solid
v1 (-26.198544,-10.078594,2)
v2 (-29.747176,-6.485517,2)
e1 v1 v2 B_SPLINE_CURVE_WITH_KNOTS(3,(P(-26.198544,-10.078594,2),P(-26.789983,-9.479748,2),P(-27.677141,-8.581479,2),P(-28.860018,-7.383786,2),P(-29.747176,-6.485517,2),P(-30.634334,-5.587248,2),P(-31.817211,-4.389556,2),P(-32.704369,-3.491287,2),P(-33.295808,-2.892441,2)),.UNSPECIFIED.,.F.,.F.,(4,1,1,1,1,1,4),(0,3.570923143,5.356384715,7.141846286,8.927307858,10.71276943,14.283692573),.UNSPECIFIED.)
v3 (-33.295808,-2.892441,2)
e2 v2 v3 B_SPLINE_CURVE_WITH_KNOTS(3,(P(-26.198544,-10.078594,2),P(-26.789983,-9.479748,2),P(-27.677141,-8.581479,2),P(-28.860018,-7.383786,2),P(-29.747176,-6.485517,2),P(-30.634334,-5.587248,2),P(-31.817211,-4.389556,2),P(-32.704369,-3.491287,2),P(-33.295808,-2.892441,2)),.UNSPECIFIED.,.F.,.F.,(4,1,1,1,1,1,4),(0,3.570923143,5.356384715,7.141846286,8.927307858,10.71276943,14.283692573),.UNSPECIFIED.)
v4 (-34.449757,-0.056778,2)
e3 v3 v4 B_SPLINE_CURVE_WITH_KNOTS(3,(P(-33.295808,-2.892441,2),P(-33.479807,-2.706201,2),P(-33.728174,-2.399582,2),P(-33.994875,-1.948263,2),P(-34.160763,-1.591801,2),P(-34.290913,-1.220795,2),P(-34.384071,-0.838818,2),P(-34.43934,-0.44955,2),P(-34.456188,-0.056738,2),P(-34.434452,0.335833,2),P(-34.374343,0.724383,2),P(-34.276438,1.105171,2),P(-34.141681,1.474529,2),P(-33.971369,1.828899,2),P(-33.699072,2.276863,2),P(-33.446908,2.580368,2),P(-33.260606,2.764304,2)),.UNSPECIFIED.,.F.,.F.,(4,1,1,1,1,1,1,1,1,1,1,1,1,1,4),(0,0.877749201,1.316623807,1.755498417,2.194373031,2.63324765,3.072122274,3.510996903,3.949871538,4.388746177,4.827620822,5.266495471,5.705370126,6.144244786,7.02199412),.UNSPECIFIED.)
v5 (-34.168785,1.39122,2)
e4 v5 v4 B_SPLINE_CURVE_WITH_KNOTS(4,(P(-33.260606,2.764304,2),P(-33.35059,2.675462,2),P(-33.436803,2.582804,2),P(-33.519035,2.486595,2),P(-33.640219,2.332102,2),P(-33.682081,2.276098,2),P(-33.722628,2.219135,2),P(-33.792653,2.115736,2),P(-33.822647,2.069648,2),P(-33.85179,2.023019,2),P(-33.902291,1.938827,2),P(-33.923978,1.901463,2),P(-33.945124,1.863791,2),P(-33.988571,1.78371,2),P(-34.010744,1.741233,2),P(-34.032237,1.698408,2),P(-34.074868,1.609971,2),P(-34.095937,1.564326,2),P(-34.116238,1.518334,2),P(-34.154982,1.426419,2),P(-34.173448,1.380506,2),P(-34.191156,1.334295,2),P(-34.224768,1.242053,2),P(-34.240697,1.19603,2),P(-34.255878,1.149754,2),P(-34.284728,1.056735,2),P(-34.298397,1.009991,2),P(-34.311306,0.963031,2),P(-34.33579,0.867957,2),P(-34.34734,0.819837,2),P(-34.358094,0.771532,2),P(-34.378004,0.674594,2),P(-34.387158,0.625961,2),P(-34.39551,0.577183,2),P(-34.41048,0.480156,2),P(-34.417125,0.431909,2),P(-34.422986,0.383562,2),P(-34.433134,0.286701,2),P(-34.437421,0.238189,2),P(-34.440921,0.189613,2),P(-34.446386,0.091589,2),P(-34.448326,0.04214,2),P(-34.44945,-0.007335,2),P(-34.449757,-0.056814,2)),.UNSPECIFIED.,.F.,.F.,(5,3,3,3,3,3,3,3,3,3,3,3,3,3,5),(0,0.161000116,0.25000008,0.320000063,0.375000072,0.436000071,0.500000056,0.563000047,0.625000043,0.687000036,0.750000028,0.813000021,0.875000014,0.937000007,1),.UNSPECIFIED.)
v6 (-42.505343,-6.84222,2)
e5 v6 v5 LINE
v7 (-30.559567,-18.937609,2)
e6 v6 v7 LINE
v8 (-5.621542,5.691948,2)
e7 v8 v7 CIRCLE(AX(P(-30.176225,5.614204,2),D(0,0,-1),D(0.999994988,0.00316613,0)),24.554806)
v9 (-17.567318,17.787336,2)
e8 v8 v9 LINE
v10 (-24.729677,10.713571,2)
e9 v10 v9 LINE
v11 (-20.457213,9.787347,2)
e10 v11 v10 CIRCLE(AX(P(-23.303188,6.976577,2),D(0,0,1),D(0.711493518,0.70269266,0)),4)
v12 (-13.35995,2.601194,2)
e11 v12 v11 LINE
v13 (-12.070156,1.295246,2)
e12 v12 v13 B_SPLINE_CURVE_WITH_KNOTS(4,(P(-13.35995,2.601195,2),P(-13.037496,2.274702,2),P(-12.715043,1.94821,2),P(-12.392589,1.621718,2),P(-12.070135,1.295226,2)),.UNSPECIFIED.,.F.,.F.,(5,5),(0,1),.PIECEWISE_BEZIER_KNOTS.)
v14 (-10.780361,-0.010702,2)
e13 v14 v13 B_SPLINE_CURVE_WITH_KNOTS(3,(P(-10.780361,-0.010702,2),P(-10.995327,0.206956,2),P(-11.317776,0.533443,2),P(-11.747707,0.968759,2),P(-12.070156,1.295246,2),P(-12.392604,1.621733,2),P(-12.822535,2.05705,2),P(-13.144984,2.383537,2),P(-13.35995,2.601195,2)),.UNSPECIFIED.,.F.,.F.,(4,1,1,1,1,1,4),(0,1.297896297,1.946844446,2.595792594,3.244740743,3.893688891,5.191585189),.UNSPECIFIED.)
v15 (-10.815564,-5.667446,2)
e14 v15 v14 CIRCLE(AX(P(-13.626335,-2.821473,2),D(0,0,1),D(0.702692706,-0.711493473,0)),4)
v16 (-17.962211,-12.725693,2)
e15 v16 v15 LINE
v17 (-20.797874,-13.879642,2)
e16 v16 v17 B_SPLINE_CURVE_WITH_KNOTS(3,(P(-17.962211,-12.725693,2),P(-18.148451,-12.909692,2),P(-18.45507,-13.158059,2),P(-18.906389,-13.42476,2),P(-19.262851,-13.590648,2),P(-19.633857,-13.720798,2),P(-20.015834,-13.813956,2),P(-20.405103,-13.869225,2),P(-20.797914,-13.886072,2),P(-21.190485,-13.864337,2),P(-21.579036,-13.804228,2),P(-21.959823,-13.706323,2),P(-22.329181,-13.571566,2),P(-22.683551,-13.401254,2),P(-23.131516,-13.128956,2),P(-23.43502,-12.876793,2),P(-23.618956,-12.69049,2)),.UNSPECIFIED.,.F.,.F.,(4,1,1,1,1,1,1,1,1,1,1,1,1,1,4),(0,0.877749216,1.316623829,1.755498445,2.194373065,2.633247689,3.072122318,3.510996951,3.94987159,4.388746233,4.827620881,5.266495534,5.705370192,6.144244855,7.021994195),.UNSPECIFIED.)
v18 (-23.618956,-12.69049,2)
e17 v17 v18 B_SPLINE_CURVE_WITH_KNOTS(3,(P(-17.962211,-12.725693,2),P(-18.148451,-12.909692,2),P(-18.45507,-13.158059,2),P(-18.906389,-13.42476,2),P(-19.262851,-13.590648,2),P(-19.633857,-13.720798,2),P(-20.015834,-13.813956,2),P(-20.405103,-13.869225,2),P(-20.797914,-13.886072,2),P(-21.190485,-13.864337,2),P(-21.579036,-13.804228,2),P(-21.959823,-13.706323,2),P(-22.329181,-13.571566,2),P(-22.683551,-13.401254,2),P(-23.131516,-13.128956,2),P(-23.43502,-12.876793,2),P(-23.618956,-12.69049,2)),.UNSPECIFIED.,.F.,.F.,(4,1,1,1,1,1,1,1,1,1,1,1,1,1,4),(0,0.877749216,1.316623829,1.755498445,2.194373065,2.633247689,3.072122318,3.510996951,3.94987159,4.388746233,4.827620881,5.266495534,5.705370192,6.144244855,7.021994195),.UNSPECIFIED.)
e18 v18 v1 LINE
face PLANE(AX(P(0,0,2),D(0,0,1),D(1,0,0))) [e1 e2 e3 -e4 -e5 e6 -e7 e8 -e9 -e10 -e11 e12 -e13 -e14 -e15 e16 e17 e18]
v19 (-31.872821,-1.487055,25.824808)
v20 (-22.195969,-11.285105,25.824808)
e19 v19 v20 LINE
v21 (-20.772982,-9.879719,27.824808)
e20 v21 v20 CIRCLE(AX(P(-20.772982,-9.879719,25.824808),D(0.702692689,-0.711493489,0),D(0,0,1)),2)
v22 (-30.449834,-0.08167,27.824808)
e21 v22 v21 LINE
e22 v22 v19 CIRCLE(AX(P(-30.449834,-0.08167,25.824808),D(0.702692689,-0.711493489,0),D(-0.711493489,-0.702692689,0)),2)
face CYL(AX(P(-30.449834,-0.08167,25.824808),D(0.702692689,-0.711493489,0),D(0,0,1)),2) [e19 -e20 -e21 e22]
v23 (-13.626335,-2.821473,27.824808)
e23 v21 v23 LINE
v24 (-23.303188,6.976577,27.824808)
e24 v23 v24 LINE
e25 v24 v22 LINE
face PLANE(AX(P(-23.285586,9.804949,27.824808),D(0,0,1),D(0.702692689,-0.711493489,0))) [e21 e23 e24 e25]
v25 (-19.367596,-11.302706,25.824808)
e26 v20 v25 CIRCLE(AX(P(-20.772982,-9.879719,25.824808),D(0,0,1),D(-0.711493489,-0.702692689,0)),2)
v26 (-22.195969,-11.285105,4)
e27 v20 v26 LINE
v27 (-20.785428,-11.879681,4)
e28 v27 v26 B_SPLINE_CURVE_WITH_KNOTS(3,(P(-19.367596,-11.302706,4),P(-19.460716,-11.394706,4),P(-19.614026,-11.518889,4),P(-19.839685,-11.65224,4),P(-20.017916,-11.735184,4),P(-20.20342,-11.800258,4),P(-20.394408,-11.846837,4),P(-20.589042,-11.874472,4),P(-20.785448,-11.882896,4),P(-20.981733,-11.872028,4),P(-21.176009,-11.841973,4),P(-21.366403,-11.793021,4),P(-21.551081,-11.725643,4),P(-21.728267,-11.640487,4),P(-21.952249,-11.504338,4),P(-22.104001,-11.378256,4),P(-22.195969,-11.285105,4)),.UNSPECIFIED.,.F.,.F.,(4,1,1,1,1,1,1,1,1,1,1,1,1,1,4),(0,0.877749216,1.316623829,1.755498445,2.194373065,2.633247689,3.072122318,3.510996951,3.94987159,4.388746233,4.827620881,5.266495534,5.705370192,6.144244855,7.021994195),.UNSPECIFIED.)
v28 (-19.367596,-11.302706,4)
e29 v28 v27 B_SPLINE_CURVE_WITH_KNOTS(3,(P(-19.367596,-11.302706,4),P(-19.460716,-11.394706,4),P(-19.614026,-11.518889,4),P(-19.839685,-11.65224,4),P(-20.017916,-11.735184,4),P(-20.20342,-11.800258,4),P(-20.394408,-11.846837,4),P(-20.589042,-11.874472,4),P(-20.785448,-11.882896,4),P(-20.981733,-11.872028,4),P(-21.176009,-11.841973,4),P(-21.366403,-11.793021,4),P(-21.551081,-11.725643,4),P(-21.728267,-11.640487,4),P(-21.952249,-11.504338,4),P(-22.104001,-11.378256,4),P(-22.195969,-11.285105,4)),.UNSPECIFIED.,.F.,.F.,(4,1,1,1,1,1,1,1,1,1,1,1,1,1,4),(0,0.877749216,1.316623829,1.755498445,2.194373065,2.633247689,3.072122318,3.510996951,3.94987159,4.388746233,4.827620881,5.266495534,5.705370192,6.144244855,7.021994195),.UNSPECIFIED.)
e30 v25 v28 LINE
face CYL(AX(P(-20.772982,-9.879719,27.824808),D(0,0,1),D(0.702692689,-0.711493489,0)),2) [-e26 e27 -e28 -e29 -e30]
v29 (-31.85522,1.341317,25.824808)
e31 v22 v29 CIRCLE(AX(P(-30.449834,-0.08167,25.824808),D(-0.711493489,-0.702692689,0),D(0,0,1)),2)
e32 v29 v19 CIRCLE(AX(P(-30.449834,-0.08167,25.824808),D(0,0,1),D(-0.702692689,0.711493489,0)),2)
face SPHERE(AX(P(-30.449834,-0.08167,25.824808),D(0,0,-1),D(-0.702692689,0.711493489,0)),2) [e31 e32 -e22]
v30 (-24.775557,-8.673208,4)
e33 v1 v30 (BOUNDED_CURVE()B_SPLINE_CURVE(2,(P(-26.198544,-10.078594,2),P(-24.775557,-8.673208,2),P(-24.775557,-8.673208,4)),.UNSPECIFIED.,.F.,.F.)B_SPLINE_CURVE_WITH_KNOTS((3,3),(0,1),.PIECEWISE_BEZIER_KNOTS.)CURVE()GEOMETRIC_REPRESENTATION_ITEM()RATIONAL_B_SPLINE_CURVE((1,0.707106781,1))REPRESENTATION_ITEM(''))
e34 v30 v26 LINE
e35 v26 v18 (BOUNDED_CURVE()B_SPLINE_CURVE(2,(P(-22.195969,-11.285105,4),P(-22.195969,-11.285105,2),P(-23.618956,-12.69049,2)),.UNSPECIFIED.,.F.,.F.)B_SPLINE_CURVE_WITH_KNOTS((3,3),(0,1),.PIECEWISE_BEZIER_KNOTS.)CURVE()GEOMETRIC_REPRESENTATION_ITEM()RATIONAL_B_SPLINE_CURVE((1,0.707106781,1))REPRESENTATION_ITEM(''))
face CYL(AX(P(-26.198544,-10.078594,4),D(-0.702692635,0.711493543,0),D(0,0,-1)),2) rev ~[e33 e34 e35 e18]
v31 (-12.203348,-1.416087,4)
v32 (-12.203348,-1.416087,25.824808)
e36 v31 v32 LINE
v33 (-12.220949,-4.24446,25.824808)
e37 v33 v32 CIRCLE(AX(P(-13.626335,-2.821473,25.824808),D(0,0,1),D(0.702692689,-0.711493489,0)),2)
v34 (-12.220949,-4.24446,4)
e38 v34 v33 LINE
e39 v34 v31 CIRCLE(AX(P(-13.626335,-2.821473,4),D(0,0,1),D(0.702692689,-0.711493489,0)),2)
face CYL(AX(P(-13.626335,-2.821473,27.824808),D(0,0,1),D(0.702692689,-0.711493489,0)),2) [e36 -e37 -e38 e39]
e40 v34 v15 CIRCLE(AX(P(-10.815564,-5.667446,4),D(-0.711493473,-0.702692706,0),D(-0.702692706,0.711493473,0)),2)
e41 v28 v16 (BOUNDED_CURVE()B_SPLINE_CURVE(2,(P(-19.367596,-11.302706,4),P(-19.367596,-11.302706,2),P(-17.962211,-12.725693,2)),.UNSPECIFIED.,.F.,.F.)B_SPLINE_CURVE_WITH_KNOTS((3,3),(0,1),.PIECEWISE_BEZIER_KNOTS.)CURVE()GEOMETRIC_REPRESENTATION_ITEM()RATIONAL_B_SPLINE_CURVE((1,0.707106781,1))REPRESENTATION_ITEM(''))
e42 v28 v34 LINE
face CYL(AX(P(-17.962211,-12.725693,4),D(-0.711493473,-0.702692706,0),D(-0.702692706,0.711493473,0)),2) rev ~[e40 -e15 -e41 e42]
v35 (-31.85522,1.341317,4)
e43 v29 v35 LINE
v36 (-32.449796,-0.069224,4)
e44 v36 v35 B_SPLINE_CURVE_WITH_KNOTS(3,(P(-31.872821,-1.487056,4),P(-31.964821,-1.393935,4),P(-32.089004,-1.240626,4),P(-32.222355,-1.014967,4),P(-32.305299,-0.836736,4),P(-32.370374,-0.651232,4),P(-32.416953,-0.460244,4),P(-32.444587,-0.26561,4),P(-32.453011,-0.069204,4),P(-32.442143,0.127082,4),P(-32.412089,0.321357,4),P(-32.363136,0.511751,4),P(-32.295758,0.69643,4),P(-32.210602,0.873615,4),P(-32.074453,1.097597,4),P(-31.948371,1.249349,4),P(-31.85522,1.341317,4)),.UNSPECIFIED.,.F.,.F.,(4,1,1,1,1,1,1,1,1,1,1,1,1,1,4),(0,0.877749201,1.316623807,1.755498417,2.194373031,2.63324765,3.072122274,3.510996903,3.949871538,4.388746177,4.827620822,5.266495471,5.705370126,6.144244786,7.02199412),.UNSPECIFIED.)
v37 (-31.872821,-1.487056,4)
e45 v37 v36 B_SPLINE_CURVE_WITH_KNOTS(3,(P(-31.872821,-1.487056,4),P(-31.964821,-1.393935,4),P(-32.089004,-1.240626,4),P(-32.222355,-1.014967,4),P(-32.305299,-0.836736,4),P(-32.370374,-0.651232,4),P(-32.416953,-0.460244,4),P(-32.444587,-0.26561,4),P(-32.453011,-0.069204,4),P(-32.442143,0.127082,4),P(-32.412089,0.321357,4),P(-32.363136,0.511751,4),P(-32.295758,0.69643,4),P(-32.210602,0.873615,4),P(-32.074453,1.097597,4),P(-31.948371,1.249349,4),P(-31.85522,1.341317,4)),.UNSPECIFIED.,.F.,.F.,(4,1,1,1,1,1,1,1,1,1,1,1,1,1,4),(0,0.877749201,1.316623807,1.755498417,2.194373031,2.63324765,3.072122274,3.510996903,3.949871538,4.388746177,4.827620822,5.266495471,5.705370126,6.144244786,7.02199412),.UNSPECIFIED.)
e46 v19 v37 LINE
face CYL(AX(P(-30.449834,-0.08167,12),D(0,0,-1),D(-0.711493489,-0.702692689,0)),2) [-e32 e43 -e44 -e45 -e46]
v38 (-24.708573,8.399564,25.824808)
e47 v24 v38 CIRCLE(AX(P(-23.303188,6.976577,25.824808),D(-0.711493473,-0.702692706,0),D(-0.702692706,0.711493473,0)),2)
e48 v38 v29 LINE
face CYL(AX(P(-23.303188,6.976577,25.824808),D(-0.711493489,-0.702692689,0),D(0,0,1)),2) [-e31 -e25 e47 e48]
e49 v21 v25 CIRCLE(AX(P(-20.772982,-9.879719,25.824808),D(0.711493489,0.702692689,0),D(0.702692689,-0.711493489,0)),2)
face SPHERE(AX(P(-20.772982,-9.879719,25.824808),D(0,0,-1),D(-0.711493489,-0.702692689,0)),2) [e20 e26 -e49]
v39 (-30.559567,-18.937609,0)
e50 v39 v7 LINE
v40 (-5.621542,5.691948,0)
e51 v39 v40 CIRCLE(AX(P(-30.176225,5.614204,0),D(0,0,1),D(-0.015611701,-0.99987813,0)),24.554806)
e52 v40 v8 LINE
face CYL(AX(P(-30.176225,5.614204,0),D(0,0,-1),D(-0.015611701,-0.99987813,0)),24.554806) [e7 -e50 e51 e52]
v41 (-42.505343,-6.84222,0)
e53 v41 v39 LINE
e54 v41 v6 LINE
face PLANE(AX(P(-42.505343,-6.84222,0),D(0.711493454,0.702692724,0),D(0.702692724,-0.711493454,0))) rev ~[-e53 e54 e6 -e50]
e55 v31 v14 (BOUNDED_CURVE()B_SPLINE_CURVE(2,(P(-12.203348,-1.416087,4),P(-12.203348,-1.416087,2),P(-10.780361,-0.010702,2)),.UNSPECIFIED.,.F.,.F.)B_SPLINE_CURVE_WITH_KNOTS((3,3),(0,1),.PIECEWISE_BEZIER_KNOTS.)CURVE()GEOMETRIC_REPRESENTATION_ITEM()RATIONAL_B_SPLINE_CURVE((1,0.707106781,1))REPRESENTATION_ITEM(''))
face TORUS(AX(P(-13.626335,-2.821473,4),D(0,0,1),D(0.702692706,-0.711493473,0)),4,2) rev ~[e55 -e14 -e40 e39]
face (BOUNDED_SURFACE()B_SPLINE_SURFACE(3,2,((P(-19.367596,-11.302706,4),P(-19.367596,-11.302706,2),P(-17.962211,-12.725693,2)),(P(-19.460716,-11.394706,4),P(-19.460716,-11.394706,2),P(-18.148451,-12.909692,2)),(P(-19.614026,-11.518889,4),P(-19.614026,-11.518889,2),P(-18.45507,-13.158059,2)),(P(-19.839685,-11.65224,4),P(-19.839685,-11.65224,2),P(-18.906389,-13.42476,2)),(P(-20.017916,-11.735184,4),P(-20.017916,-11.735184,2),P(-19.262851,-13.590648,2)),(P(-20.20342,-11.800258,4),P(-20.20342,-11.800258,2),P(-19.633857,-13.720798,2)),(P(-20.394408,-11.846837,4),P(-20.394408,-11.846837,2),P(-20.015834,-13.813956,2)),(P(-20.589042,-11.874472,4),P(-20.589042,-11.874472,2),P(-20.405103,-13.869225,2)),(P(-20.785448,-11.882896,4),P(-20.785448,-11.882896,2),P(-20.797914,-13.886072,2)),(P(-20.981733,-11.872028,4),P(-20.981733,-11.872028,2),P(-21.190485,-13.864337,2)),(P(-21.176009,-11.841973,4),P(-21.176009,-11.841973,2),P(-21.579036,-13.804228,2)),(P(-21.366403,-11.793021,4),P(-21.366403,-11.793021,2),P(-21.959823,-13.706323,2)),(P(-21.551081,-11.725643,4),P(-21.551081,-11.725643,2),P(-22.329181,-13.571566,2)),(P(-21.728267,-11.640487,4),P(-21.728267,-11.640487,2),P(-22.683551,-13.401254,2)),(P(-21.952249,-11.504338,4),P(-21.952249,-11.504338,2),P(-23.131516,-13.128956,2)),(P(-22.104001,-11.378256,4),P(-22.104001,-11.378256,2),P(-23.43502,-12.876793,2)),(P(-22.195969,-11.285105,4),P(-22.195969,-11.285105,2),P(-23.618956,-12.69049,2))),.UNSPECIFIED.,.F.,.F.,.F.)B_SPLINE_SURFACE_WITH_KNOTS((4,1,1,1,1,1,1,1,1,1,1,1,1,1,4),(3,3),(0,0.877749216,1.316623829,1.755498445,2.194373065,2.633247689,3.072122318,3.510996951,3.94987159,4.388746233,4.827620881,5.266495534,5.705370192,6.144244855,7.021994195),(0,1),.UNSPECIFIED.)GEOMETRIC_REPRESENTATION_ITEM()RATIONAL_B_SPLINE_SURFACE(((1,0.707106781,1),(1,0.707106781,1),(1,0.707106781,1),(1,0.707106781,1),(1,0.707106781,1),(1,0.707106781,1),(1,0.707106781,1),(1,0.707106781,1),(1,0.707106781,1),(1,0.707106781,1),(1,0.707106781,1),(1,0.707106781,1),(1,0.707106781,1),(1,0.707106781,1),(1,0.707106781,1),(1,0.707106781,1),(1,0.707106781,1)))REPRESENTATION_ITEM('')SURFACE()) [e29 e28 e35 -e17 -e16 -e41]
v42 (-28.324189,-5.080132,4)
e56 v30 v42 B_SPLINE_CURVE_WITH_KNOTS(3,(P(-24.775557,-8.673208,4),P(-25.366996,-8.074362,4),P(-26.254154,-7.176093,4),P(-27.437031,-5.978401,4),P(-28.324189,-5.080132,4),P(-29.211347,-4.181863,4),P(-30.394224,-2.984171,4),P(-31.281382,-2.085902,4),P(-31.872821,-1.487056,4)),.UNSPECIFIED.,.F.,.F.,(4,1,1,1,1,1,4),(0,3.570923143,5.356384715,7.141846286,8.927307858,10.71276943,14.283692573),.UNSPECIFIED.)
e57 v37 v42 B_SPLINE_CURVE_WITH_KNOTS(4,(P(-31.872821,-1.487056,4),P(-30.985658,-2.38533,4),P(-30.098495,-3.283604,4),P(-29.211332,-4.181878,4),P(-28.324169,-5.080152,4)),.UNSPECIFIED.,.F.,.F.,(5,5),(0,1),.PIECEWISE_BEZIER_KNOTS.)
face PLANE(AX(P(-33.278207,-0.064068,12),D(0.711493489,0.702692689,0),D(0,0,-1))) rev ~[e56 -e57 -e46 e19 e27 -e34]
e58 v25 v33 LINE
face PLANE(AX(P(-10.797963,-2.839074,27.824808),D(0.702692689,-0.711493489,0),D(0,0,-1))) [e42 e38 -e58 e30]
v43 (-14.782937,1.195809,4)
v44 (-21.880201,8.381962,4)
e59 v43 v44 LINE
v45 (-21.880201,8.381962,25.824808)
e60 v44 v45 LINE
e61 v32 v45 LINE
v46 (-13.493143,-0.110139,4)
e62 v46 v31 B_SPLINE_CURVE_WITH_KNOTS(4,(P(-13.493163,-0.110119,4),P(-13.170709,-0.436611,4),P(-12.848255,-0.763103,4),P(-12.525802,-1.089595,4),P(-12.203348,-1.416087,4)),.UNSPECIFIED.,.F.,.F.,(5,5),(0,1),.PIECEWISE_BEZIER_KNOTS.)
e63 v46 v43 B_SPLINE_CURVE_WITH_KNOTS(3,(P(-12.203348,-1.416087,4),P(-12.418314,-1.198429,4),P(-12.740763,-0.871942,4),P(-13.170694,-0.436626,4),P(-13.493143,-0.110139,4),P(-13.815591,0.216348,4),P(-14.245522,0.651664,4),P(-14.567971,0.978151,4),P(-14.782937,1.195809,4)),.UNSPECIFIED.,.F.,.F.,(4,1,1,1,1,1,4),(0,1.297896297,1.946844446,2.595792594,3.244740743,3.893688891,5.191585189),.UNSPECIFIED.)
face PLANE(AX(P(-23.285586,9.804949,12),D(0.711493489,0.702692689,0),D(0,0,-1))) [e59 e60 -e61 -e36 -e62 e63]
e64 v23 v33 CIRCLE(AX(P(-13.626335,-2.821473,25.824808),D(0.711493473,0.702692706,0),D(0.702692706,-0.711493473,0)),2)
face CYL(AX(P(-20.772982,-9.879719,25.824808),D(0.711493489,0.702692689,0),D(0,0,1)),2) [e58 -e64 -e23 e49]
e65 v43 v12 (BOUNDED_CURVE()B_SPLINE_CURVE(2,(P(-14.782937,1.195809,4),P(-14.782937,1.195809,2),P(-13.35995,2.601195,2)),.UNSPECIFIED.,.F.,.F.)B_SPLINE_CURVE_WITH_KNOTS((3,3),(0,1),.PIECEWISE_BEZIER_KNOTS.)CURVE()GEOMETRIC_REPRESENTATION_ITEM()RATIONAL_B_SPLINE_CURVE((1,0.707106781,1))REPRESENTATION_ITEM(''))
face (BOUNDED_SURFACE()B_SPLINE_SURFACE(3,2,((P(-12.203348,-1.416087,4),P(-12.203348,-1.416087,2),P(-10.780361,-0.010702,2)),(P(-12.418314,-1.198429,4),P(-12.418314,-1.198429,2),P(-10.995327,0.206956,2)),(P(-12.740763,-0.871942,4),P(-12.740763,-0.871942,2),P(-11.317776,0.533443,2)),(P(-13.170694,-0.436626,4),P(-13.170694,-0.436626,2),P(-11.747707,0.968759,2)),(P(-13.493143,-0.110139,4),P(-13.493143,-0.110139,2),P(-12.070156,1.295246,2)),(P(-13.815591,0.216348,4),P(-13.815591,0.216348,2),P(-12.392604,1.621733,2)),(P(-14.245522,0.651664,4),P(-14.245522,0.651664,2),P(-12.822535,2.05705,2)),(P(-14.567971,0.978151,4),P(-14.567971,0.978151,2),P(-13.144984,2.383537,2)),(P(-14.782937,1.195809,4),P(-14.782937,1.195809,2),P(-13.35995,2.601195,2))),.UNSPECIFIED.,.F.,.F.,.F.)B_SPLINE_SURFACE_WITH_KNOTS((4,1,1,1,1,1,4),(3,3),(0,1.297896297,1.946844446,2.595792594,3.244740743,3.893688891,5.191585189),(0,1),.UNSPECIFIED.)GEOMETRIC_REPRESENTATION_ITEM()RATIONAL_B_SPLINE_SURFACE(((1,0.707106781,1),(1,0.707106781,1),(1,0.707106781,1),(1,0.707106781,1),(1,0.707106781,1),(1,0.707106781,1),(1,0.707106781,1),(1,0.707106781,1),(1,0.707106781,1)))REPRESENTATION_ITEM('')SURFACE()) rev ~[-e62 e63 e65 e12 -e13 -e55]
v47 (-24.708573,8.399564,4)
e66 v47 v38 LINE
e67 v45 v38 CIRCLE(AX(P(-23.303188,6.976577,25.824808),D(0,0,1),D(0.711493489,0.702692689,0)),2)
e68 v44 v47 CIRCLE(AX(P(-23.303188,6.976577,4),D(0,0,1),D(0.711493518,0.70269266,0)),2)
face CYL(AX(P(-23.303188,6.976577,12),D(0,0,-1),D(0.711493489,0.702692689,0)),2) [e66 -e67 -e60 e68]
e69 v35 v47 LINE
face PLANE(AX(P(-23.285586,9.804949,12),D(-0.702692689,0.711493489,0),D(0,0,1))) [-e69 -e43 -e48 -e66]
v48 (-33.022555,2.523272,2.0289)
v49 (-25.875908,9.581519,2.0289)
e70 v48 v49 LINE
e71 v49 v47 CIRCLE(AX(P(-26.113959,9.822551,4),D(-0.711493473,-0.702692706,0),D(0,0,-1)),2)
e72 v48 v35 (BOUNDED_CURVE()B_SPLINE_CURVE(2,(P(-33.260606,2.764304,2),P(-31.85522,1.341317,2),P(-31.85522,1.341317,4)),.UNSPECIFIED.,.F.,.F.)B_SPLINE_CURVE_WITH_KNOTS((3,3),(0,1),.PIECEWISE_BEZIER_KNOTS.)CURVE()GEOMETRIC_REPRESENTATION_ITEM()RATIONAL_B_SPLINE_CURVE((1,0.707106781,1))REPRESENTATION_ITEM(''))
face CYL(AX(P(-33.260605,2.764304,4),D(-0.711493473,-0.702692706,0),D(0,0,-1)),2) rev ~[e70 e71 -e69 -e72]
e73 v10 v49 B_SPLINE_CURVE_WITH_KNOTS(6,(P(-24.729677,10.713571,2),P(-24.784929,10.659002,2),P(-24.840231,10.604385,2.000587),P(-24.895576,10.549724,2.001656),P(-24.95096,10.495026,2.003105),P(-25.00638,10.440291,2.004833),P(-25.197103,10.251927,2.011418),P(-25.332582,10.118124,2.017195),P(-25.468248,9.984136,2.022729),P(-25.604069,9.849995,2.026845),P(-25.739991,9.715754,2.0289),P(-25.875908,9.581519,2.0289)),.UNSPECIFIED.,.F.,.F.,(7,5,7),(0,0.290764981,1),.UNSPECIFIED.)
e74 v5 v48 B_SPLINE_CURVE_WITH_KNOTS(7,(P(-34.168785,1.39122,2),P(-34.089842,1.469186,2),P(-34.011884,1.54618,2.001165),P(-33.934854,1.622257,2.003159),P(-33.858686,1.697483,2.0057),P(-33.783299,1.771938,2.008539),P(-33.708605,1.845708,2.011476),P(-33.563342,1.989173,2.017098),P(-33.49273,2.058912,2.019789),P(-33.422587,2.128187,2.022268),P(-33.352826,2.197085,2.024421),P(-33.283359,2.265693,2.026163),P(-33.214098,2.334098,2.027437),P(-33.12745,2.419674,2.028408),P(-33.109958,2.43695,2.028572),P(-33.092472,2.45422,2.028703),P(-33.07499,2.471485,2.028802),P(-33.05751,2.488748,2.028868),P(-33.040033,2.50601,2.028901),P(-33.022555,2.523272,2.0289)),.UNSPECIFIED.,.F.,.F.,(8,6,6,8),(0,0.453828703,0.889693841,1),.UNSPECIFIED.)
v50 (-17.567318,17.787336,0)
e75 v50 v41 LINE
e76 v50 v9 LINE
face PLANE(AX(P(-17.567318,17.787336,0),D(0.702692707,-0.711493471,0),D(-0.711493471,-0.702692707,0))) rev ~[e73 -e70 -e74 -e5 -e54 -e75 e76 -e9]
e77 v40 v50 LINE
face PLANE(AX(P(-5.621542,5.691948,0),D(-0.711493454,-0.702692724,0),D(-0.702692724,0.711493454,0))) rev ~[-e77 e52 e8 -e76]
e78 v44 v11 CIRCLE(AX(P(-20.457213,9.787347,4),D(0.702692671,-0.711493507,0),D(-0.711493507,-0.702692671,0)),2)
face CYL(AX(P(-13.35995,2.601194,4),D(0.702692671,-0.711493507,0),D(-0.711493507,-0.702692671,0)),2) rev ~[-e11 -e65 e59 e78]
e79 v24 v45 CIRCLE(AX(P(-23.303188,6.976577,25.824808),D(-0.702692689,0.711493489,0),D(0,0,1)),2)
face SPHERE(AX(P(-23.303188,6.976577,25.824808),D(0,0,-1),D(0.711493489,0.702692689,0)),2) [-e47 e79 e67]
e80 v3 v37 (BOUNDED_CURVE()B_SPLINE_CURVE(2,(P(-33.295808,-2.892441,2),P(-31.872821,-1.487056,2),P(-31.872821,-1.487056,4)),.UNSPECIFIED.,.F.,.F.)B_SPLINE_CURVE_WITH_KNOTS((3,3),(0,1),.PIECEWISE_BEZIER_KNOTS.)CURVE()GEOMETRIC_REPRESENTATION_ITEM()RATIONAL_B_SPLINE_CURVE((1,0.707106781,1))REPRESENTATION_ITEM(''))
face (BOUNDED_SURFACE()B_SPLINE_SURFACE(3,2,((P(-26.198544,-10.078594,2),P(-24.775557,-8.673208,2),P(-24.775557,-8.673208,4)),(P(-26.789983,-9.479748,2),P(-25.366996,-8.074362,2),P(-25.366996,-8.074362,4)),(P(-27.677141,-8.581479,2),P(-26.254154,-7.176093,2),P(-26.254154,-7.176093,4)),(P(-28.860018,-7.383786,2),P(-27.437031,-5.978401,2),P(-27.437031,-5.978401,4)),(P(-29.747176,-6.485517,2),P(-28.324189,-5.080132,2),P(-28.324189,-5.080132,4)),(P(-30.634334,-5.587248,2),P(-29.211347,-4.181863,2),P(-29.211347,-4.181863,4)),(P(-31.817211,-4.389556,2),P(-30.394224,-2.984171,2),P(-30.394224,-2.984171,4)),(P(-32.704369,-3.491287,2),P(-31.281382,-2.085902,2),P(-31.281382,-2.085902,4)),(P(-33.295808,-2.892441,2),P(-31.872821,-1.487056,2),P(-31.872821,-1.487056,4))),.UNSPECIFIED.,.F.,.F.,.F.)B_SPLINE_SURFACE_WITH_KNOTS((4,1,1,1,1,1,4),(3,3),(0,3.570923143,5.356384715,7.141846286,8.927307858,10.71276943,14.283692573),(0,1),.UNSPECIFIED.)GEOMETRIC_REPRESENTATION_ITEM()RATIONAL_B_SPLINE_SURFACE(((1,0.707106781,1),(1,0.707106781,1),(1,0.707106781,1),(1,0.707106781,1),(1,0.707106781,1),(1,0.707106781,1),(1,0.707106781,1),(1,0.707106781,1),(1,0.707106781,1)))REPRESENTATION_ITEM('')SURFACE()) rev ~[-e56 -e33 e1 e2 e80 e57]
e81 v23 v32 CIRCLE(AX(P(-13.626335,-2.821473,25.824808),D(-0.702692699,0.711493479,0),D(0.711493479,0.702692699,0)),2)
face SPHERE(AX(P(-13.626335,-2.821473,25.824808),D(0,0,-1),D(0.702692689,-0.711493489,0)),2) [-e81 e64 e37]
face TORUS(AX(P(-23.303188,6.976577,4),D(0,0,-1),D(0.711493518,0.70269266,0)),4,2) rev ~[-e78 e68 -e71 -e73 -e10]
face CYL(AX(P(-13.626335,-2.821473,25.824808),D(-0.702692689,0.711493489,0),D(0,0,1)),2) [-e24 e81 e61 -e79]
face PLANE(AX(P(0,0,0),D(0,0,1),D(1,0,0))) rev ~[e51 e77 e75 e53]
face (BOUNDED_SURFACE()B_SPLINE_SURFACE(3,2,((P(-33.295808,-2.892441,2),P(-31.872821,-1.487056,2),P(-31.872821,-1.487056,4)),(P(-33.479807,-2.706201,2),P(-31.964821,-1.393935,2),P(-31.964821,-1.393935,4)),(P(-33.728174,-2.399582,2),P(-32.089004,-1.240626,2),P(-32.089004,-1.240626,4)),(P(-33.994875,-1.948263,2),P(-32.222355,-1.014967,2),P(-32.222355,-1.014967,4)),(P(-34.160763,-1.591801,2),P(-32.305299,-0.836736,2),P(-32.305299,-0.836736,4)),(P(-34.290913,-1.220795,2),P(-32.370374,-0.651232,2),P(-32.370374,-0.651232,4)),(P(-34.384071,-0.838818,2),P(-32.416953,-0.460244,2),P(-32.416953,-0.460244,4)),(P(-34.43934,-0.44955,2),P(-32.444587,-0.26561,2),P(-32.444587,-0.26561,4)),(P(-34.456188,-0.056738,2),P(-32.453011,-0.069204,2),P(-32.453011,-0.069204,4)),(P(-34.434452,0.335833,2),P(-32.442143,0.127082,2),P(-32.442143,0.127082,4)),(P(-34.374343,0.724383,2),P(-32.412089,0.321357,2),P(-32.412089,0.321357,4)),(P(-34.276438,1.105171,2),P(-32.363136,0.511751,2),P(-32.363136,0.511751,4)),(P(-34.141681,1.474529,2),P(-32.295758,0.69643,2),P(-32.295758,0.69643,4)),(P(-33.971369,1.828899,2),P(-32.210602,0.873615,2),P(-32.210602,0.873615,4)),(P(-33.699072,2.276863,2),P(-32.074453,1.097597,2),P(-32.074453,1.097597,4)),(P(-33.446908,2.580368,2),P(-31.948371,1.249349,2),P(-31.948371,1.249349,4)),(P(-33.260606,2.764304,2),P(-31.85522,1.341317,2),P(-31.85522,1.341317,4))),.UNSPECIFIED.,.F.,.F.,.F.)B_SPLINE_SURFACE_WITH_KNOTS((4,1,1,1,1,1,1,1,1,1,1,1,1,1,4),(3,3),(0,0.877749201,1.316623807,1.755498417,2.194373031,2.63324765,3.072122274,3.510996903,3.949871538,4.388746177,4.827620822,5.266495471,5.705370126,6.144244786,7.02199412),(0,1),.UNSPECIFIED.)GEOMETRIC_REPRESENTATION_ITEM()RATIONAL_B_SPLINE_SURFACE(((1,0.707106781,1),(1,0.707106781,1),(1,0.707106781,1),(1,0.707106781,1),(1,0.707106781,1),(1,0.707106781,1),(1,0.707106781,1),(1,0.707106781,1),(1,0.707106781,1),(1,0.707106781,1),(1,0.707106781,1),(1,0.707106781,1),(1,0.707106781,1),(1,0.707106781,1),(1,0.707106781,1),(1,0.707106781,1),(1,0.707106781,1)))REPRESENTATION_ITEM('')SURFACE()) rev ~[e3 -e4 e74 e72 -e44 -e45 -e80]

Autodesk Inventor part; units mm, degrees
ref_plane "YZ Plane" through (0, 0, 0) normal (1, 0, 0) x (0, 1, 0)
ref_plane "XZ Plane" through (0, 0, 0) normal (0, 1, 0) x (-1, 0, 0)
ref_plane "XY Plane" through (0, 0, 0) normal (0, 0, 1) x (1, 0, 0)
ref_plane "Plan de construction1" through (0, 0, 0) normal (0, 0, 1) x (1, 0, 0)
sketch "Esquisse1" plane through (0, 0, 0) normal (0, 0, 1) x (1, 0, 0)
  line L0 (12.600402, 13.369459) -> (-37.128252, -35.732002)
  line L1 (-42.505343, -6.84222) -> (-16.505712, -33.167478)
  line L2 (8.432313, -8.537922) -> (-17.567318, 17.787336)
  line L3 (-17.567318, 17.787336) -> (-42.505343, -6.84222)
  spline S0 degree 3 poles (-30.559567, -18.937609) (-29.251135, -19.178539) (-27.810091, -19.446017) (-24.924717, -19.685136) (-23.47934, -19.643963) (-21.695605, -19.298823) (-21.177712, -19.167045) (-20.168818, -18.825553) (-19.677941, -18.615468) (-18.84768, -18.187738) (-18.426343, -17.934552) (-17.631099, -17.362687) (-17.257309, -17.043846) (-16.938864, -16.72934) knots 0 0 0 0 0.39912855 0.39912855 0.7982571 0.7982571 0.94417416 0.94417416 1.09009122 1.09009122 1.22436299 1.22436299 1.35863477 1.35863477 1.35863477 1.35863477
  spline S1 degree 3 poles (-7.999161, -7.900216) (-7.680716, -7.58571) (-7.357248, -7.215917) (-6.77553, -6.427852) (-6.517119, -6.009699) (-6.079089, -5.184826) (-5.862912, -4.696602) (-5.508889, -3.692036) (-5.370676, -3.175823) (-5.003363, -1.396522) (-4.944203, 0.048231) (-5.147393, 2.936358) (-5.396916, 4.380619) (-5.621542, 5.691948) knots 3.77145385 3.77145385 3.77145385 3.77145385 3.90572563 3.90572563 4.0399974 4.0399974 4.18591446 4.18591446 4.33183152 4.33183152 4.73096007 4.73096007 5.13008862 5.13008862 5.13008862 5.13008862
  line L4 (-16.938864, -16.72934) -> (-7.999161, -7.900216)
  line L5 (-17.567318, 17.787336) -> (-5.621542, 5.691948)
  line L6 (-17.567318, 17.787336) -> (-42.505343, -6.84222)
  line L7 (-42.505343, -6.84222) -> (-30.559567, -18.937609)
  arc A0 (-30.559567, -18.937609) -> (-5.621542, 5.691948) centre (-30.176225, 5.614205) ccw
  point P0 (0, 0)
extrude "Extrusion1" add sketch "Esquisse1" along normal blind 2 contours A0 L0 L1 L3 L2 | A0 L0
sketch "Esquisse2" plane through (0, 0, 2) normal (0, 0, 1) x (1, 0, 0)
  line L0 (37.657428, -63.069018) -> (-69.549529, 45.480633)
  line L1 (37.657428, -63.069018) -> (-69.549529, 45.480633)
  line L2 (-29.434692, -3.955721) -> (-33.278207, -0.064069)
  line L3 (-33.278207, -0.064069) -> (-23.285586, 9.804949)
  line L4 (-23.285586, 9.804949) -> (-19.442072, 5.913297)
  line L5 (-24.775557, -8.673208) -> (-20.790583, -12.708092)
  line L6 (-20.790583, -12.708092) -> (-10.797962, -2.839074)
  line L7 (-10.797962, -2.839074) -> (-14.782937, 1.195809)
  line L8 (-24.775557, -8.673208) -> (-29.434692, -3.955721)
  line L9 (-19.442072, 5.913297) -> (-14.782937, 1.195809)
  point P0 (0, 0)
  point P1 (-20.366346, -4.318536)
extrude "Extrusion2" add sketch "Esquisse2" along normal blind 10
sketch "Esquisse6" plane through (-23.285586, 9.804949, 12) normal (0.7114935, 0.7026927, 0) x (0, 0, -1)
  line L0 (0, 0) -> (-15.824808, 0)
  line L1 (-15.824808, 0) -> (-15.824808, -17.771102)
  line L2 (-15.824808, -17.771102) -> (0, -17.771102)
  line L3 (0, -17.771102) -> (0, 0)
  point P0 (12, -23.338769)
  point P1 (0, -17.771102)
extrude "Extrusion6" add sketch "Esquisse6" against normal up to surface (14.044571 mm away)
fillet "Congé4" radius 2 8 edges at (-33.2782, -0.0641, 14.9124) (-23.2856, 9.8049, 14.9124) (-20.7906, -12.7081, 14.9124) (-15.7943, -7.7736, 2) (-17.0418, 3.4829, 2) (-27.0344, -6.3861, 2) (-28.2819, 4.8704, 2) (-10.798, -2.8391, 14.9124)
fillet_without_effect "Congé6"
fillet "Congé7" radius 2 8 edges at (-11.6264, -2.8339, 27.8248) (-32.4498, -0.0692, 27.8248) (-20.7854, -11.8797, 27.8248) (-15.7943, -7.7736, 27.8248) (-23.2907, 8.9765, 27.8248) (-17.0418, 3.4829, 27.8248) (-28.2819, 4.8704, 27.8248) (-27.0344, -6.3861, 27.8248)
properties part number "palette_push"
